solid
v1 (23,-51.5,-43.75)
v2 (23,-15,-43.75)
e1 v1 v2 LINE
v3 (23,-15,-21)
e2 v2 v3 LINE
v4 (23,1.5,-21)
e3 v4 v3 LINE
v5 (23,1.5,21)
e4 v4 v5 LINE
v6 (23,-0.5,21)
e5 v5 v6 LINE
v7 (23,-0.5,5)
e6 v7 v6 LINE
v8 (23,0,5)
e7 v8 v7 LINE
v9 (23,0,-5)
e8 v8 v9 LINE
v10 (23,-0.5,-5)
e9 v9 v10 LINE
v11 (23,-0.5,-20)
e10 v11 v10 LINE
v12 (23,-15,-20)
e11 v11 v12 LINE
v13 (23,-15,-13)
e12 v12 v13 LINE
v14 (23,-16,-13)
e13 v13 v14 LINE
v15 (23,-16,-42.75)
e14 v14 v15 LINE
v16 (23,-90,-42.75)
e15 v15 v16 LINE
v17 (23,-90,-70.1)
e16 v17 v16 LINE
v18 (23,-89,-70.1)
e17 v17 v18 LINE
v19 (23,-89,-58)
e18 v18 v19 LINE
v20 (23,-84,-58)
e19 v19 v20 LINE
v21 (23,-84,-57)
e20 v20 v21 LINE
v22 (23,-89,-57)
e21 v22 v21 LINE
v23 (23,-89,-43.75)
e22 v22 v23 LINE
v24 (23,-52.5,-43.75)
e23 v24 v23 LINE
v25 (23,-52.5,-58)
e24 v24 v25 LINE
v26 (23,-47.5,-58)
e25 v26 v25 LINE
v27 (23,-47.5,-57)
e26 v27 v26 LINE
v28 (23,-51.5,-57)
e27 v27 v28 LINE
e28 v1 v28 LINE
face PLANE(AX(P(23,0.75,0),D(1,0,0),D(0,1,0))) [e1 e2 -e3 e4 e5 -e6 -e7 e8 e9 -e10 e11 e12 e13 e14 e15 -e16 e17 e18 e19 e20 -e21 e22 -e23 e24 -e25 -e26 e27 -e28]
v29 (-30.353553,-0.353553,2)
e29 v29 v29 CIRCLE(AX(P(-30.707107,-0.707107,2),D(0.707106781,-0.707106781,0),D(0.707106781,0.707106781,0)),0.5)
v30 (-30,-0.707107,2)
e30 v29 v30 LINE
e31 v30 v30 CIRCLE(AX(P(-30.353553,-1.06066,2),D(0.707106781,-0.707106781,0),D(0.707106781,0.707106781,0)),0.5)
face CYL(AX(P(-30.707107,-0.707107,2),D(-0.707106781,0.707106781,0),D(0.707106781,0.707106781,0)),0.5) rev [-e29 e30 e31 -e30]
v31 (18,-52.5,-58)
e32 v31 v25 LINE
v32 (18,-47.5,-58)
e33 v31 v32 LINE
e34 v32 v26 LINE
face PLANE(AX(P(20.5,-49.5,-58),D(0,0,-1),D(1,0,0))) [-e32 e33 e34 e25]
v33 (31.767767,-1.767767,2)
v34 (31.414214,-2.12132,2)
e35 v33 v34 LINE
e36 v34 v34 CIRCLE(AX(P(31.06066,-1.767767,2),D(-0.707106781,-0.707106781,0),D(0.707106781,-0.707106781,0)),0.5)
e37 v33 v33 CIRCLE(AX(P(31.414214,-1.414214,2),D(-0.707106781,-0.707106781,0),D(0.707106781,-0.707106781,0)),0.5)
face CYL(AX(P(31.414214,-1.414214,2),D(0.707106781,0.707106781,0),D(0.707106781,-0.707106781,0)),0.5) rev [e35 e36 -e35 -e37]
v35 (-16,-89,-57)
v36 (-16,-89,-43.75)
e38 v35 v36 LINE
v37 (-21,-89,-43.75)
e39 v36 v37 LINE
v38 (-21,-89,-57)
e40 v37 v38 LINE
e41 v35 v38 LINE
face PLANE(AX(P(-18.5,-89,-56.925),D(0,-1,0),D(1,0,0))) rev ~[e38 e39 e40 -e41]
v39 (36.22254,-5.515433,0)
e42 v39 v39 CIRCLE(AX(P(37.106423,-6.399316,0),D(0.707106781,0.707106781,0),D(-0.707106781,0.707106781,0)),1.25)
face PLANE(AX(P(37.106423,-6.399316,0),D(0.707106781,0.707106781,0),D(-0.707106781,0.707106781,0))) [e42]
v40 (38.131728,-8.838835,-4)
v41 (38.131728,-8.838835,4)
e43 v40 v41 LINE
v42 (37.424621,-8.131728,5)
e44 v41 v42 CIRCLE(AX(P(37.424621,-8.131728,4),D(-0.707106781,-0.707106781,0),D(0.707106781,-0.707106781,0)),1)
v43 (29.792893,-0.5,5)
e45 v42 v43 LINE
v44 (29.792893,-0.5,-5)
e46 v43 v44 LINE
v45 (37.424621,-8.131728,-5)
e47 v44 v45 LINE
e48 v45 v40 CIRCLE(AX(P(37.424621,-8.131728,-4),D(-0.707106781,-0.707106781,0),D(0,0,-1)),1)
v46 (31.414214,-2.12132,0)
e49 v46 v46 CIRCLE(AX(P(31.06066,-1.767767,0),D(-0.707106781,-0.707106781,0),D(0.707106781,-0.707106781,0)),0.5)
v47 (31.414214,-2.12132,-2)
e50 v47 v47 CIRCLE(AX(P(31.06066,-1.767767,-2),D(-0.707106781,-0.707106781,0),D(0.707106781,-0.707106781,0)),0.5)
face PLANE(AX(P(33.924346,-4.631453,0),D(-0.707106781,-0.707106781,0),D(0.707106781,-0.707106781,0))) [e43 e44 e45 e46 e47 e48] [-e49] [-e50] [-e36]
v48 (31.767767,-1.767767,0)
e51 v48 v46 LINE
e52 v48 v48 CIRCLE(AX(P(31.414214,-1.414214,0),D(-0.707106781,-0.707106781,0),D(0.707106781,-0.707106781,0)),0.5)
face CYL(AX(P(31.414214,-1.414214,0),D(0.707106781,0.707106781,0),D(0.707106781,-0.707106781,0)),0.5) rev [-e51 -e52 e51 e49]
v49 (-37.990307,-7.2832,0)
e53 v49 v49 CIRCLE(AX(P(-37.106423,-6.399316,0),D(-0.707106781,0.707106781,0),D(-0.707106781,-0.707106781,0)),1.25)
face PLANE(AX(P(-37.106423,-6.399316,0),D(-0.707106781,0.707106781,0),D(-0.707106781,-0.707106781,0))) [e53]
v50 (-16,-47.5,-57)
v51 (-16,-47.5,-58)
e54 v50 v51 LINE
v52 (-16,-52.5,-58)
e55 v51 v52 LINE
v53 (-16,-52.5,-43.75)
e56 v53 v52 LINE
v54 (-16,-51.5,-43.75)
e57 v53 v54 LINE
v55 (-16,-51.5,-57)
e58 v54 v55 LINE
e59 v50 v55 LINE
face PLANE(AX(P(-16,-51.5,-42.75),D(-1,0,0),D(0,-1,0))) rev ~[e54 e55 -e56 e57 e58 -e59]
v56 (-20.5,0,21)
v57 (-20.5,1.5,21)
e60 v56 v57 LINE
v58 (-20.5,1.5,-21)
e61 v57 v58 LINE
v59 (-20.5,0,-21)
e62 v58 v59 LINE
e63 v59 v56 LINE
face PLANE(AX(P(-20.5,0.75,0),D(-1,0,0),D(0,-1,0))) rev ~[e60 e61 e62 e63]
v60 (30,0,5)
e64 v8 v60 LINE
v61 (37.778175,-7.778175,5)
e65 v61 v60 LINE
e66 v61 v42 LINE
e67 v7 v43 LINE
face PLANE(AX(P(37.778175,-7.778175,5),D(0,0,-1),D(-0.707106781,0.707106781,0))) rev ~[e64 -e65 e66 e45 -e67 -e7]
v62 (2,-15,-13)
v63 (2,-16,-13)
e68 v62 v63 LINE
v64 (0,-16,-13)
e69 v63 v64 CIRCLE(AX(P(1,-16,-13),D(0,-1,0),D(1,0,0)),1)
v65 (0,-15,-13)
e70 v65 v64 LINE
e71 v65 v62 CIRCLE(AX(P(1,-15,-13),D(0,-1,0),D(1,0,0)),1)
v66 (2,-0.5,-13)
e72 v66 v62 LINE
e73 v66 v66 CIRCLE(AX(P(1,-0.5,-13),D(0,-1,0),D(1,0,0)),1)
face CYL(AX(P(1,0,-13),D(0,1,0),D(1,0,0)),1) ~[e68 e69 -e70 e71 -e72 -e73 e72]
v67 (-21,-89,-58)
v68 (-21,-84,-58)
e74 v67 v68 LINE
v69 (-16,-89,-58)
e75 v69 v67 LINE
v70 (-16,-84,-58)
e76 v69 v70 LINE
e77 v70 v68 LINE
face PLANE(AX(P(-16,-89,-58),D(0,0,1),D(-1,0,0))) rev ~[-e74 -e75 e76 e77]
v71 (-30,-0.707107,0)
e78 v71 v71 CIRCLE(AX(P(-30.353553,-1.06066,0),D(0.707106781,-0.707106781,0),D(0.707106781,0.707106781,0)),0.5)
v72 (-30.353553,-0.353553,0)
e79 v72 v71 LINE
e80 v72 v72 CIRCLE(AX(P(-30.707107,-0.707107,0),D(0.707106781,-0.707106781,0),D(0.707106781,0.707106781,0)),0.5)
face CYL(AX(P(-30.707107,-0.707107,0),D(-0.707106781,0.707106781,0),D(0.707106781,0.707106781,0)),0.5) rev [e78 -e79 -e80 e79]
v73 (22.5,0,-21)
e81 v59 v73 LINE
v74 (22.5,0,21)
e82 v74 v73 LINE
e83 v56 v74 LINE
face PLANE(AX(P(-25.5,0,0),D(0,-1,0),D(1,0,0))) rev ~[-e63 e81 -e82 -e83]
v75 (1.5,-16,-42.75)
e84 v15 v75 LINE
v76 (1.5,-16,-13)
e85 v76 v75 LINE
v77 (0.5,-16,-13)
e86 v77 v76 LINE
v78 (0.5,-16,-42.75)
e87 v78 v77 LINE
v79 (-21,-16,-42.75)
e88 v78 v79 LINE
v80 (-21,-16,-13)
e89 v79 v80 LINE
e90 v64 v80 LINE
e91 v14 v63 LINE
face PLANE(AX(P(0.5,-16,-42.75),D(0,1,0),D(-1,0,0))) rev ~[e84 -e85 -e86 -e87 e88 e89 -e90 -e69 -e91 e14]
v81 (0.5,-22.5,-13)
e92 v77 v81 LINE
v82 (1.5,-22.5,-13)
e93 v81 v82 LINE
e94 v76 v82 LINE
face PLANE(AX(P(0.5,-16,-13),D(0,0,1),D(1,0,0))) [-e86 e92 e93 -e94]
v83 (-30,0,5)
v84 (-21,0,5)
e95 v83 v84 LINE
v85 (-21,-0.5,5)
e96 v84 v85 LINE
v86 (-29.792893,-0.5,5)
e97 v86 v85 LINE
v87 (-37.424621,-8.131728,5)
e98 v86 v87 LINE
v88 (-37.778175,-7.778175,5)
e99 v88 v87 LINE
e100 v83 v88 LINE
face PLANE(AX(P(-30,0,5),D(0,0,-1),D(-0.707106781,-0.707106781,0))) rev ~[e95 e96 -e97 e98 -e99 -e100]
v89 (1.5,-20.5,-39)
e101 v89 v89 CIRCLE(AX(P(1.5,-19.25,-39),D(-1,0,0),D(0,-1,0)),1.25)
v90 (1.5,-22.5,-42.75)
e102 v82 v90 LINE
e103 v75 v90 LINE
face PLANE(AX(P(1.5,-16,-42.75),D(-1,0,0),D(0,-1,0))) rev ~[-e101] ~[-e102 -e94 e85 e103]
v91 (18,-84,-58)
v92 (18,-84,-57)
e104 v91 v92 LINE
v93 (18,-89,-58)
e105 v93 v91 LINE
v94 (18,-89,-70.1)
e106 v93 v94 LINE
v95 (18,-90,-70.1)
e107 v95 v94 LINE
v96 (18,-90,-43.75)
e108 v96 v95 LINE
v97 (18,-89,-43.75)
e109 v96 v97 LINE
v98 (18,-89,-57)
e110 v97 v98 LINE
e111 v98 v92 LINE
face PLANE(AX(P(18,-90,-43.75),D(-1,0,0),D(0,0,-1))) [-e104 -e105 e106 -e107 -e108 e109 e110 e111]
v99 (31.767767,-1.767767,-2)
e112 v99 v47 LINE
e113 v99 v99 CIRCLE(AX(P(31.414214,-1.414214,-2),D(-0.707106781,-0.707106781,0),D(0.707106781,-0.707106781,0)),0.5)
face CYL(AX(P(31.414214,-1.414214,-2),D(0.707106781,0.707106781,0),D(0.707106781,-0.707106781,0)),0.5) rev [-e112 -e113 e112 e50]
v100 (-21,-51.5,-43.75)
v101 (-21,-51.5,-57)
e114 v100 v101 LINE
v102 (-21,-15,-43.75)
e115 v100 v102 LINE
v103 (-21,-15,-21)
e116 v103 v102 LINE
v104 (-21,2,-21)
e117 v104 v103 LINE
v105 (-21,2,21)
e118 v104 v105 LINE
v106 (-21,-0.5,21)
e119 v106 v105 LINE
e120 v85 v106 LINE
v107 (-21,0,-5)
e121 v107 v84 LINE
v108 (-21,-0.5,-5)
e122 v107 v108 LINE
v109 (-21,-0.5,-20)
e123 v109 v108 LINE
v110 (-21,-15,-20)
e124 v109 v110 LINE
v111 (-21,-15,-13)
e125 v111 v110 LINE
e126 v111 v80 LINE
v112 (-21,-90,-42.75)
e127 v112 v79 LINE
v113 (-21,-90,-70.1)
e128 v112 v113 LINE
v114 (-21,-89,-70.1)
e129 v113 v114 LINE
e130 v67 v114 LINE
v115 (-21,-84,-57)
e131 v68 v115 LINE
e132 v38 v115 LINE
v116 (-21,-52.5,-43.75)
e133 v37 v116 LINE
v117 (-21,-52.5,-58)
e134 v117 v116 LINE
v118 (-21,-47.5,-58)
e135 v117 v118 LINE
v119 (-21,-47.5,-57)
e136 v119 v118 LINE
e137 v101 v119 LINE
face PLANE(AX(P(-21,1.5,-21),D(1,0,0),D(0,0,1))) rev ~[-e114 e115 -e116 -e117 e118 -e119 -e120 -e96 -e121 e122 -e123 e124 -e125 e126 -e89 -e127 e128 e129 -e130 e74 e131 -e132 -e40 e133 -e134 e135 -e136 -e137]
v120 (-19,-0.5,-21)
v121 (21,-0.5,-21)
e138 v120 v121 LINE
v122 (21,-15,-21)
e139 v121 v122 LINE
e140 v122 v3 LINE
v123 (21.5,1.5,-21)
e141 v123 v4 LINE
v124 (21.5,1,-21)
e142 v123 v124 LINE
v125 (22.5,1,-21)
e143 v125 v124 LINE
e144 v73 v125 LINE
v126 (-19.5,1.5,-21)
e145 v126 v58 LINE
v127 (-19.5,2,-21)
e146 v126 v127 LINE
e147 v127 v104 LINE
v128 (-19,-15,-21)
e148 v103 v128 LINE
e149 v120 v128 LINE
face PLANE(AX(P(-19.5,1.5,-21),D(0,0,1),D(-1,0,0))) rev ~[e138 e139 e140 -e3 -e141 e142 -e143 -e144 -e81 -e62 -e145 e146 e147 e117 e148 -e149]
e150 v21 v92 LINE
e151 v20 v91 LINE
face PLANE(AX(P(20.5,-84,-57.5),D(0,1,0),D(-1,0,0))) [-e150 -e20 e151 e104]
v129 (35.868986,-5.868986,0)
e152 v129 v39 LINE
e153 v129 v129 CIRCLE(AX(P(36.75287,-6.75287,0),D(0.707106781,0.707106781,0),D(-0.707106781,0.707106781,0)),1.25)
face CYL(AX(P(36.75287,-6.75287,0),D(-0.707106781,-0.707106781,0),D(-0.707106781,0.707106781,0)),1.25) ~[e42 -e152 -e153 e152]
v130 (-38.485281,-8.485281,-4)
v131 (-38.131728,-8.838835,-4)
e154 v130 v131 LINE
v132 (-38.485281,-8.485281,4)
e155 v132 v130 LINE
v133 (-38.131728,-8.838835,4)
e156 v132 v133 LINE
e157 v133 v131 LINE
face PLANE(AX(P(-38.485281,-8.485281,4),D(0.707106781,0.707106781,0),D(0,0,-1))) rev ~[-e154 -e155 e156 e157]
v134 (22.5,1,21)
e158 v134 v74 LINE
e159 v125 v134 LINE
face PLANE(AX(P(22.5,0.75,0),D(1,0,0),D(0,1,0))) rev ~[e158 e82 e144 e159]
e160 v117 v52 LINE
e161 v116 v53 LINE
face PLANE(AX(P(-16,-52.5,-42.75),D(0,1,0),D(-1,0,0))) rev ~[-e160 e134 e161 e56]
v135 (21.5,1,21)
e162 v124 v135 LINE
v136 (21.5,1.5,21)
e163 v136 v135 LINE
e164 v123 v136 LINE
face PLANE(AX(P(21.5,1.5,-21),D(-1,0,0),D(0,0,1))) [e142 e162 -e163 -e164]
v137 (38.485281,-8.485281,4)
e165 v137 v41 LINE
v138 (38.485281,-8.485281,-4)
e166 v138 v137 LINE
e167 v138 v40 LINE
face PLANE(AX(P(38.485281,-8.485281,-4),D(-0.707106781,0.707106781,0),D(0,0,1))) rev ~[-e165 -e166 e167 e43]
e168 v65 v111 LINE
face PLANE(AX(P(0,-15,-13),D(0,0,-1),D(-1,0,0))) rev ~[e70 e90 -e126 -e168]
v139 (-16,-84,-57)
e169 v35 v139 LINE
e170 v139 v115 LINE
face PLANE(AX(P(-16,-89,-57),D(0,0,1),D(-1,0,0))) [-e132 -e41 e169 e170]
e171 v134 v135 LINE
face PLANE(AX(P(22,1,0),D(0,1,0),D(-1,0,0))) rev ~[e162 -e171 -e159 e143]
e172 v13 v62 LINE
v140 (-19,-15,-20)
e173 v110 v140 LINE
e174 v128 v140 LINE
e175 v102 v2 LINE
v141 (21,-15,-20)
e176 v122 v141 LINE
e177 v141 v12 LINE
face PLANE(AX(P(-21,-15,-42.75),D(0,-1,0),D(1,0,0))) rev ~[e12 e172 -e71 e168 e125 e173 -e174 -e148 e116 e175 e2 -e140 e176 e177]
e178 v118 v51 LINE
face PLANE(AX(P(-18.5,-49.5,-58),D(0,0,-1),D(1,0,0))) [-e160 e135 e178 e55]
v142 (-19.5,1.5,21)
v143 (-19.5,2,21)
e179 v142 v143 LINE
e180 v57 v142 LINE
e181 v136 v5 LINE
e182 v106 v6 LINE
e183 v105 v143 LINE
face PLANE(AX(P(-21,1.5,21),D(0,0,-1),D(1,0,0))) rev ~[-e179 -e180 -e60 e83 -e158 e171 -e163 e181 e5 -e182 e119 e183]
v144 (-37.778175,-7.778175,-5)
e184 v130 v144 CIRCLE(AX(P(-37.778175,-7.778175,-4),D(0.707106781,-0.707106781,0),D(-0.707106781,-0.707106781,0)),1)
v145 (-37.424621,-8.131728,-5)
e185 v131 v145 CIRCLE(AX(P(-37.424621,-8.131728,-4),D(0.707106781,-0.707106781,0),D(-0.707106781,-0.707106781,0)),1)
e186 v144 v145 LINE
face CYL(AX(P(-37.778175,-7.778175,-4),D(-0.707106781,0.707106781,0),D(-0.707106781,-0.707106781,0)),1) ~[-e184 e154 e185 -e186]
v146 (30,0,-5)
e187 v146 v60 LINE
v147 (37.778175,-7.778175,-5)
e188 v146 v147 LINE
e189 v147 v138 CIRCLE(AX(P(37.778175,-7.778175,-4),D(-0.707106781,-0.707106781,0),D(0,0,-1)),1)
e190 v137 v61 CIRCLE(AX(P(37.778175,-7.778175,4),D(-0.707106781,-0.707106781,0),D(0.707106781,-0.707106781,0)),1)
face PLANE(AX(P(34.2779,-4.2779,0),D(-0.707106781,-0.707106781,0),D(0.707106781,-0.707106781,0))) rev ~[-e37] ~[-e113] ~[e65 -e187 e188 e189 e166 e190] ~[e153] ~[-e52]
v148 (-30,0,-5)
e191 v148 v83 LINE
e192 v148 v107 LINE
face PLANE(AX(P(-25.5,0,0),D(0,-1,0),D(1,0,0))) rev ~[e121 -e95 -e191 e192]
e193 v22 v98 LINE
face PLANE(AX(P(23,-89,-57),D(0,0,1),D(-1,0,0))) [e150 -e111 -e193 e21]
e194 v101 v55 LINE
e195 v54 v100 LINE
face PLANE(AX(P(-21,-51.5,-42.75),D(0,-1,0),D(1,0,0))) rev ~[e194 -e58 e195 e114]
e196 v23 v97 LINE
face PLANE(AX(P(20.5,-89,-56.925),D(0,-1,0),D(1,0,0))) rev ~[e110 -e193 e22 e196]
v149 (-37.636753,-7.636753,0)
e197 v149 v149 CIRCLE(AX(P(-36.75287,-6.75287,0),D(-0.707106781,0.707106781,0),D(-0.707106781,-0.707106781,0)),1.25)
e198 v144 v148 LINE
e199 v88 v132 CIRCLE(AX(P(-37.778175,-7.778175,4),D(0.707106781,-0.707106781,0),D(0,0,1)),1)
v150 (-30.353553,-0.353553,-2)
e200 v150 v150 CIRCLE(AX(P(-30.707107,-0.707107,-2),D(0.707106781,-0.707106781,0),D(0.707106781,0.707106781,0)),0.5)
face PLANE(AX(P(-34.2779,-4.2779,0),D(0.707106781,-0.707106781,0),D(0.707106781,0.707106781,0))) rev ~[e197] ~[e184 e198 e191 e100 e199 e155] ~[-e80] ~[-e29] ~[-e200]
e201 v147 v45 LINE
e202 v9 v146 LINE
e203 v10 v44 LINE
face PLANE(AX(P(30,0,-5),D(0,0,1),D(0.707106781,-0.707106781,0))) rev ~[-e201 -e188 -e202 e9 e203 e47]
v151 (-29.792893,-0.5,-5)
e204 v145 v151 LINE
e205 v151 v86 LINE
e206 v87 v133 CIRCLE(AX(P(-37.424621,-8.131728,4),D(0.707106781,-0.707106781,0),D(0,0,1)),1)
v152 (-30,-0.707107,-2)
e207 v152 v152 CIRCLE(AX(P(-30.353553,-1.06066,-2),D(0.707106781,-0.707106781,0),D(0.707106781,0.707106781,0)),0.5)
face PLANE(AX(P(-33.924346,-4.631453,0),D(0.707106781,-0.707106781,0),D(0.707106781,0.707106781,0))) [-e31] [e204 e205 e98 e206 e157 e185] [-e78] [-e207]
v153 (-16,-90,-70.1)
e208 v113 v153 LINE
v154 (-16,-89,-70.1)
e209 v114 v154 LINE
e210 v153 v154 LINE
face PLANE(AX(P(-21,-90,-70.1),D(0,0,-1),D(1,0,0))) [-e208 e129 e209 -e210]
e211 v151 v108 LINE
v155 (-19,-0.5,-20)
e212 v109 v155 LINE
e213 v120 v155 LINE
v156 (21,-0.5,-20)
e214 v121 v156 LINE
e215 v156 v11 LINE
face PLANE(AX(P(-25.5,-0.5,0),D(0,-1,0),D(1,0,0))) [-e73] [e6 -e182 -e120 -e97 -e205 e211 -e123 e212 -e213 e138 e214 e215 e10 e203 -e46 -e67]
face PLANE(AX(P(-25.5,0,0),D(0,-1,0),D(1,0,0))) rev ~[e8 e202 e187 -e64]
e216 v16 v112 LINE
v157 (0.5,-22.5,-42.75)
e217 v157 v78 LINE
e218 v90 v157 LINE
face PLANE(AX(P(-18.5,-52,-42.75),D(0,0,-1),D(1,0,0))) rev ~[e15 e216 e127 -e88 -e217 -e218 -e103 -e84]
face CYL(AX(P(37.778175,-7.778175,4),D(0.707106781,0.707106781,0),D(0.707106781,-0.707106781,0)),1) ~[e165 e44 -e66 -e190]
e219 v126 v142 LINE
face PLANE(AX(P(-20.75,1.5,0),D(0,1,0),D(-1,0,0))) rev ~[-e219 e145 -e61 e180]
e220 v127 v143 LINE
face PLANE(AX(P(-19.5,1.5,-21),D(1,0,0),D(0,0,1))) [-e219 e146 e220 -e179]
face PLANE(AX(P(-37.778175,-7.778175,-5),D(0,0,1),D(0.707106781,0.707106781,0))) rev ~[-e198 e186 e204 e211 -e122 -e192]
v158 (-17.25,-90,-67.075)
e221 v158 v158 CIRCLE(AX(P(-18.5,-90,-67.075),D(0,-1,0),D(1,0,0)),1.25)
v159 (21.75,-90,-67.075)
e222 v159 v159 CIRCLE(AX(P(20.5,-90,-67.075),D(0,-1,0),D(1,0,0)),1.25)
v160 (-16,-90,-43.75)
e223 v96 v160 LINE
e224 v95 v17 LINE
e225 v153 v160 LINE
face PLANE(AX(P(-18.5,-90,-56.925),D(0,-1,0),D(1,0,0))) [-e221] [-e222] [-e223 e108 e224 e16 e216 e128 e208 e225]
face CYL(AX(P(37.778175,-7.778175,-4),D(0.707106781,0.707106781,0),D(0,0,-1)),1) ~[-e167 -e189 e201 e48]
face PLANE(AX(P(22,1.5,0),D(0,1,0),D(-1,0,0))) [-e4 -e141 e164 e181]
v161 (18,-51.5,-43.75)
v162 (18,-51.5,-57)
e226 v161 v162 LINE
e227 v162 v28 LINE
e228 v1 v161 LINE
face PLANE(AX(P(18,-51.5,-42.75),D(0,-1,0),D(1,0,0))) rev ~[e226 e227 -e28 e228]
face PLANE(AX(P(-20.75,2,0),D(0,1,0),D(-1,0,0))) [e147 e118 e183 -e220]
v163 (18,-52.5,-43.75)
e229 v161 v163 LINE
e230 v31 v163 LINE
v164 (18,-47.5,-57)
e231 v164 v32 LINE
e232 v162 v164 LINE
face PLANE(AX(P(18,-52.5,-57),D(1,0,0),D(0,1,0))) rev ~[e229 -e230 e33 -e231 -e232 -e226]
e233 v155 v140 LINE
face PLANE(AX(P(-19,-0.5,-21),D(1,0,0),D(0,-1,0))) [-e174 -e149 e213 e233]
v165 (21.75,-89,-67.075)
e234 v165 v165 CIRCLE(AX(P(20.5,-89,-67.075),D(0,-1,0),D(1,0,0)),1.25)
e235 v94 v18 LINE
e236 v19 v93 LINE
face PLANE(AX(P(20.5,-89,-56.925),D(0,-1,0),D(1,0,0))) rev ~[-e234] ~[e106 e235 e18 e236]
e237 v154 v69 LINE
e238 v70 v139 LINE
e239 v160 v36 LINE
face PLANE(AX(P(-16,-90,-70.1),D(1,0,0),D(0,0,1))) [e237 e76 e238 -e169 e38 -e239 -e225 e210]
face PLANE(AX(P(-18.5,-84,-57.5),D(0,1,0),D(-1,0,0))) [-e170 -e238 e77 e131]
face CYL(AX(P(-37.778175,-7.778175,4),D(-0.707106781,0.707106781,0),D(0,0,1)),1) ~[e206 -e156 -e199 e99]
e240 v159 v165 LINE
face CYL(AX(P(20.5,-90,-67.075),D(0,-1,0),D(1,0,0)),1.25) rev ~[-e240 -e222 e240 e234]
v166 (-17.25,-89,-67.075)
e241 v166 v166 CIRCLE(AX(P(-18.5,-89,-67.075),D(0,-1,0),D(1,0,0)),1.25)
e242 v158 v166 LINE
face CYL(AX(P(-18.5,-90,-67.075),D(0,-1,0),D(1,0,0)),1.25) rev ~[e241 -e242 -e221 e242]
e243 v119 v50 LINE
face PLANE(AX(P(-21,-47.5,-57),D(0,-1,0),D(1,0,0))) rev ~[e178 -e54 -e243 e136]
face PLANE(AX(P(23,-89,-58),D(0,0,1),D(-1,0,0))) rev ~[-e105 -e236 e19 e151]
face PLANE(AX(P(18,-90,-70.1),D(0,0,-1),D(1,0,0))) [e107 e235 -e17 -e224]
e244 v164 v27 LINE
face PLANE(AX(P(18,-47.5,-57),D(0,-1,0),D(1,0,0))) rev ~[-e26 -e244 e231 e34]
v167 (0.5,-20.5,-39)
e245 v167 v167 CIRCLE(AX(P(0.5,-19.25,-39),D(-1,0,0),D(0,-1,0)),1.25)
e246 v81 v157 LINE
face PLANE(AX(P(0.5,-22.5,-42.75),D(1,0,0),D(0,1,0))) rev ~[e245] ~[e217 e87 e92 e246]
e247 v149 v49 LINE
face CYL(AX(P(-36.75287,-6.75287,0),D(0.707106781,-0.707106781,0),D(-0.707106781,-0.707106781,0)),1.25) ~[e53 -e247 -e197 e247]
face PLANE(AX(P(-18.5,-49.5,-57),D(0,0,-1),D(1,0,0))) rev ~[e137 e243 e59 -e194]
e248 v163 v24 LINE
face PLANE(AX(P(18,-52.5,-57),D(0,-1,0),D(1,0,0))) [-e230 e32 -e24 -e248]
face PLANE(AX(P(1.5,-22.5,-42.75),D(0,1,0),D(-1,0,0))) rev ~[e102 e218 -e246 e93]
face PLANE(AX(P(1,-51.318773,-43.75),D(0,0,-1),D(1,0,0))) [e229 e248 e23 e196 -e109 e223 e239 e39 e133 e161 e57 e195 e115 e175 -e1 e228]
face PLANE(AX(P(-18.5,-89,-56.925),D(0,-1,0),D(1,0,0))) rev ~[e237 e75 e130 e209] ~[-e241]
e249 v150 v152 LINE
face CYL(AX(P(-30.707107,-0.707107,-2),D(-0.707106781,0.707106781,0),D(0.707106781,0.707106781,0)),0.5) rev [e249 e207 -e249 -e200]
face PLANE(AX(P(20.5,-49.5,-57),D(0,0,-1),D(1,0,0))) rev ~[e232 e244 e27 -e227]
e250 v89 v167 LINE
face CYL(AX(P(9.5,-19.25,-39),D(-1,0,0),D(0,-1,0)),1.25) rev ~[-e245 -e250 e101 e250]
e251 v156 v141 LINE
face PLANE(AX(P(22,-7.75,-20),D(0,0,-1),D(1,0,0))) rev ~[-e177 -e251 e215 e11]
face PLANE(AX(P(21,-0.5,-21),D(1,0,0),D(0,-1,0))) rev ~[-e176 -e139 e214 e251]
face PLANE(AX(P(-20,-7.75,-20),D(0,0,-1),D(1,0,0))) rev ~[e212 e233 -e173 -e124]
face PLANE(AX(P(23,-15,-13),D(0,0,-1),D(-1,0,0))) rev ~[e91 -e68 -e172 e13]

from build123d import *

# Parameters (mm, degrees)
F0_W      = 9
F0_H      = 10
F0_W_2    = 44
F0_H_2    = 16
F0_W_3    = 7
F0_R      = 1
F1_DEPTH  = 0.5
F3_R      = 0.5
F3_W      = 0.3535533906
F3_H      = 10
F4_DEPTH  = 0.5
F6_R      = 0.5
F6_W      = 0.3535533906
F6_H      = 10
F7_DEPTH  = 0.5
F8_R      = 1.25
F9_DEPTH  = 0.5
F10_R     = 1.25
F11_DEPTH = 0.5
F12_DEPTH = 0.5
F14_DEPTH = 15
F13_W     = 2
F13_H     = 14.5
F15_DEPTH = 1
F16_W     = 2
F16_H     = 1
F17_DEPTH = 1
F18_W     = 1
F18_H     = 29.75
F19_DEPTH = 6.5
F21_D     = 2.5
F21_DEPTH = 8
F21_TIP   = 0.7510757738
F23_DEPTH = 1
F25_DEPTH = 1
F26_R     = 1.25
F27_DEPTH = 1
F28_W     = 5
F28_H     = 1
F29_DEPTH = 5
F30_DEPTH = 14.25
F31_W     = 5
F31_H     = 4
F31_H_2   = 1
F32_DEPTH = 1
F34_DEPTH = 0.5
F35_W     = 1
F35_H     = 42
F36_DEPTH = 0.5
F38_DEPTH = 0.5
F39_W     = 0.5
F39_H     = 42
F39_W_2   = 1
F40_DEPTH = 0.5


# Not quite as in the source:
# - a feature of the source that left no trace in its solid (it failed there, or was rolled back) is left out
# - a feature names something its author has since deleted; it is built from what else it names


with BuildPart() as f1:
    # F0 (on Front) → F1 (new body)
    with BuildSketch(Plane.XZ):
        with Locations((-25.5, 0)):
            Rectangle(F0_W, F0_H)
        with Locations((1, 13)):
            Rectangle(F0_W_2, F0_H_2)
        with Locations((1, 0)):
            Rectangle(F0_W_2, F0_H)
        with Locations((26.5, 0)):
            Rectangle(F0_W_3, F0_H)
        with Locations((1, -13)):
            Rectangle(F0_W_2, F0_H_2)
        with Locations((1, -13)):
            Circle(F0_R, mode=Mode.SUBTRACT)
    extrude(amount=F1_DEPTH)

    # F3 (on face) → F4 (join)
    with BuildSketch(Plane(origin=(15, 15, 0), x_dir=(0.7071067812, -0.7071067812, 0), z_dir=(-0.7071067812, -0.7071067812, 0))):
        with BuildLine():
            Line((21.5667568262, 5), (21.5667568262, -5))
            Line((21.5667568262, -5), (32.2132034356, -5))
            ThreePointArc((32.2132034356, -5), (32.9203102168, -4.7071067812), (33.2132034356, -4))
            Line((33.2132034356, -4), (33.2132034356, 4))
            ThreePointArc((33.2132034356, 4), (32.9203102168, 4.7071067812), (32.2132034356, 5))
            Line((32.2132034356, 5), (21.5667568262, 5))
        make_face()
        with Locations((23.2132034356, -2)):
            Circle(F3_R, mode=Mode.SUBTRACT)
        with Locations((23.2132034356, 0)):
            Circle(F3_R, mode=Mode.SUBTRACT)
        with Locations((23.2132034356, 2)):
            Circle(F3_R, mode=Mode.SUBTRACT)
        with Locations((21.3899801309, 0)):
            Rectangle(F3_W, F3_H)
    extrude(amount=F4_DEPTH)

    # F6 (on face) → F7 (join)
    with BuildSketch(Plane(origin=(-15, 15, 0), x_dir=(0.7071067812, 0.7071067812, 0), z_dir=(0.7071067812, -0.7071067812, 0))):
        with BuildLine():
            Line((-21.5667568262, -5), (-21.5667568262, 5))
            Line((-21.5667568262, 5), (-32.2132034356, 5))
            ThreePointArc((-32.2132034356, 5), (-32.9203102168, 4.7071067812), (-33.2132034356, 4))
            Line((-33.2132034356, 4), (-33.2132034356, -4))
            ThreePointArc((-33.2132034356, -4), (-32.9203102168, -4.7071067812), (-32.2132034356, -5))
            Line((-32.2132034356, -5), (-21.5667568262, -5))
        make_face()
        with Locations((-22.2132034356, -2)):
            Circle(F6_R, mode=Mode.SUBTRACT)
        with Locations((-22.2132034356, 0)):
            Circle(F6_R, mode=Mode.SUBTRACT)
        with Locations((-22.2132034356, 2)):
            Circle(F6_R, mode=Mode.SUBTRACT)
        with Locations((-21.3899801309, 0)):
            Rectangle(F6_W, F6_H)
    extrude(amount=F7_DEPTH)

    # F8 (on face) → F9 (join)
    with BuildSketch(Plane(origin=(15, 15, 0), x_dir=(-0.7071067812, 0.7071067812, 0), z_dir=(0.7071067812, 0.7071067812, 0))):
        with Locations((-30.7632034356, 0)):
            Circle(F8_R)
    extrude(amount=F9_DEPTH)

    # F10 (on face) → F11 (join)
    with BuildSketch(Plane(origin=(-15, 15, 0), x_dir=(-0.7071067812, -0.7071067812, 0), z_dir=(-0.7071067812, 0.7071067812, 0))):
        with Locations((30.7632034356, 0)):
            Circle(F10_R)
    extrude(amount=F11_DEPTH)

    # F0 (on Front) → F12 (join)
    with BuildSketch(Plane.XZ):
        with Locations((1, 13)):
            Rectangle(F0_W_2, F0_H_2)
        with Locations((1, -13)):
            Rectangle(F0_W_2, F0_H_2)
        with Locations((1, -13)):
            Circle(F0_R, mode=Mode.SUBTRACT)
    extrude(amount=F12_DEPTH)

    # F0 (on Front) → F14 (join)
    with BuildSketch(Plane.XZ):
        with Locations((1, -13)):
            Circle(F0_R)
    extrude(amount=F14_DEPTH)

    # F13 (on face) → F15 (join)
    with BuildSketch(Plane(origin=(0, 0, -21), x_dir=(1, 0, 0), z_dir=(0, 0, -1))):
        with Locations((-20, 7.75)):
            Rectangle(F13_W, F13_H)
        with Locations((22, 7.75)):
            Rectangle(F13_W, F13_H)
    extrude(amount=-F15_DEPTH)

    # F16 (on face) → F17 (join)
    with BuildSketch(Plane.XZ.offset(15)):
        with BuildLine():
            Line((-19, -21), (-21, -21))
            Line((-21, -21), (-21, -42.75))
            Line((-21, -42.75), (23, -42.75))
            Line((23, -42.75), (23, -21))
            Line((23, -21), (21, -21))
            Line((21, -21), (21, -20))
            Line((21, -20), (23, -20))
            Line((23, -20), (23, -13))
            Line((23, -13), (2, -13))
            ThreePointArc((2, -13), (1, -14), (0, -13))
            Line((0, -13), (-21, -13))
            Line((-21, -13), (-21, -20))
            Line((-21, -20), (-19, -20))
            Line((-19, -20), (-19, -21))
        make_face()
        with Locations((-20, -20.5)):
            Rectangle(F16_W, F16_H)
        with BuildLine():
            ThreePointArc((2, -13), (1, -12), (0, -13))
            Line((0, -13), (2, -13))
        make_face()
        with BuildLine():
            Line((2, -13), (0, -13))
            ThreePointArc((0, -13), (1, -14), (2, -13))
        make_face()
        with Locations((22, -20.5)):
            Rectangle(F16_W, F16_H)
    extrude(amount=F17_DEPTH)

    # F18 (on face) → F19 (join)
    with BuildSketch(Plane.XZ.offset(16)):
        with Locations((1, -27.875)):
            Rectangle(F18_W, F18_H)
    extrude(amount=F19_DEPTH)

    # F21
    with Locations(Plane.YZ.offset(1.5)):
        with Locations((-19.25, -39)):
            Hole(F21_D / 2, depth=F21_DEPTH)
            with Locations((0, 0, -(F21_DEPTH + F21_TIP / 2))):  # 118° drill point
                Cone(0, F21_D / 2, F21_TIP, mode=Mode.SUBTRACT)

    # F22 (on face) → F23 (join)
    with BuildSketch(Plane(origin=(0, 0, -42.75), x_dir=(1, 0, 0), z_dir=(0, 0, -1))):
        Polygon((-21, 15), (23, 15), (23, 16), (1.5, 16), (1.5, 22.5), (0.5, 22.5), (0.5, 16), (-21, 16), align=None)
    extrude(amount=F23_DEPTH)

    # F22 (on face) → F25 (join)
    with BuildSketch(Plane(origin=(0, 0, -42.75), x_dir=(1, 0, 0), z_dir=(0, 0, -1))):
        Polygon((1.5, 16), (23, 16), (23, 51.5), (18, 51.5), (18, 52.5), (23, 52.5), (23, 53), (23, 90), (-21, 90), (-21, 52.5), (-16, 52.5), (-16, 51.5), (-21, 51.5), (-21, 16), (0.5, 16), (0.5, 22.5), (1.5, 22.5), align=None)
        Polygon((-21, 15), (23, 15), (23, 16), (1.5, 16), (1.5, 22.5), (0.5, 22.5), (0.5, 16), (-21, 16), align=None)
    extrude(amount=F25_DEPTH)

    # F26 (on face) → F27 (join)
    with BuildSketch(Plane.XZ.offset(90)):
        Polygon((-16, -43.75), (-21, -43.75), (-21, -58), (-21, -70.1), (-16, -70.1), align=None)
        with Locations((-18.5, -67.075)):
            Circle(F26_R, mode=Mode.SUBTRACT)
        Polygon((23, -43.75), (18, -43.75), (18, -70.1), (23, -70.1), (23, -58), align=None)
        with Locations((20.5, -67.075)):
            Circle(F26_R, mode=Mode.SUBTRACT)
    extrude(amount=-F27_DEPTH)

    # F28 (on face) → F29 (join)
    with BuildSketch(Plane(origin=(0, -89, 0), x_dir=(-1, 0, 0), z_dir=(0, 1, 0))):
        with Locations((18.5, -57.5)):
            Rectangle(F28_W, F28_H)
        with Locations((-20.5, -57.5)):
            Rectangle(F28_W, F28_H)
    extrude(amount=F29_DEPTH)

    # F22 (on face) → F30 (join)
    with BuildSketch(Plane(origin=(0, 0, -42.75), x_dir=(1, 0, 0), z_dir=(0, 0, -1))):
        Polygon((-21, 52), (-21, 51.5), (-16, 51.5), (-16, 52.5), (-21, 52.5), align=None)
        Polygon((18, 51.5), (23, 51.5), (23, 52), (23, 52.5), (18, 52.5), align=None)
    extrude(amount=F30_DEPTH)

    # F31 (on face) → F32 (join)
    with BuildSketch(Plane(origin=(0, 0, -57), x_dir=(1, 0, 0), z_dir=(0, 0, -1))):
        with Locations((20.5, 49.5)):
            Rectangle(F31_W, F31_H)
        with Locations((20.5, 52)):
            Rectangle(F31_W, F31_H_2)
        with Locations((-18.5, 49.5)):
            Rectangle(F31_W, F31_H)
        with Locations((-18.5, 52)):
            Rectangle(F31_W, F31_H_2)
    extrude(amount=F32_DEPTH)

    # F33 (on face) → F34 (join)
    with BuildSketch(Plane.YZ.offset(23)):
        Polygon((0, 21), (0, 5), (0, -5), (0, -21), (1.5, -21), (1.5, 21), align=None)
    extrude(amount=-F34_DEPTH)

    # F35 (on face) → F36 (join)
    with BuildSketch(Plane(origin=(0, 1.5, 0), x_dir=(-1, 0, 0), z_dir=(0, 1, 0))):
        with Locations((-22, 0)):
            Rectangle(F35_W, F35_H)
    extrude(amount=-F36_DEPTH)

    # F37 (on face) → F38 (join)
    with BuildSketch(Plane(origin=(-21, 0, 0), x_dir=(0, -1, 0), z_dir=(-1, 0, 0))):
        Polygon((-1.5, -21), (0, -21), (0, -5), (0, 21), (-1.5, 21), align=None)
    extrude(amount=-F38_DEPTH)

    # F39 (on face) → F40 (join)
    with BuildSketch(Plane(origin=(0, 1.5, 0), x_dir=(-1, 0, 0), z_dir=(0, 1, 0))):
        with Locations((20.75, 0)):
            Rectangle(F39_W, F39_H)
        with Locations((20, 0)):
            Rectangle(F39_W_2, F39_H)
    extrude(amount=F40_DEPTH)


solid = f1.part
